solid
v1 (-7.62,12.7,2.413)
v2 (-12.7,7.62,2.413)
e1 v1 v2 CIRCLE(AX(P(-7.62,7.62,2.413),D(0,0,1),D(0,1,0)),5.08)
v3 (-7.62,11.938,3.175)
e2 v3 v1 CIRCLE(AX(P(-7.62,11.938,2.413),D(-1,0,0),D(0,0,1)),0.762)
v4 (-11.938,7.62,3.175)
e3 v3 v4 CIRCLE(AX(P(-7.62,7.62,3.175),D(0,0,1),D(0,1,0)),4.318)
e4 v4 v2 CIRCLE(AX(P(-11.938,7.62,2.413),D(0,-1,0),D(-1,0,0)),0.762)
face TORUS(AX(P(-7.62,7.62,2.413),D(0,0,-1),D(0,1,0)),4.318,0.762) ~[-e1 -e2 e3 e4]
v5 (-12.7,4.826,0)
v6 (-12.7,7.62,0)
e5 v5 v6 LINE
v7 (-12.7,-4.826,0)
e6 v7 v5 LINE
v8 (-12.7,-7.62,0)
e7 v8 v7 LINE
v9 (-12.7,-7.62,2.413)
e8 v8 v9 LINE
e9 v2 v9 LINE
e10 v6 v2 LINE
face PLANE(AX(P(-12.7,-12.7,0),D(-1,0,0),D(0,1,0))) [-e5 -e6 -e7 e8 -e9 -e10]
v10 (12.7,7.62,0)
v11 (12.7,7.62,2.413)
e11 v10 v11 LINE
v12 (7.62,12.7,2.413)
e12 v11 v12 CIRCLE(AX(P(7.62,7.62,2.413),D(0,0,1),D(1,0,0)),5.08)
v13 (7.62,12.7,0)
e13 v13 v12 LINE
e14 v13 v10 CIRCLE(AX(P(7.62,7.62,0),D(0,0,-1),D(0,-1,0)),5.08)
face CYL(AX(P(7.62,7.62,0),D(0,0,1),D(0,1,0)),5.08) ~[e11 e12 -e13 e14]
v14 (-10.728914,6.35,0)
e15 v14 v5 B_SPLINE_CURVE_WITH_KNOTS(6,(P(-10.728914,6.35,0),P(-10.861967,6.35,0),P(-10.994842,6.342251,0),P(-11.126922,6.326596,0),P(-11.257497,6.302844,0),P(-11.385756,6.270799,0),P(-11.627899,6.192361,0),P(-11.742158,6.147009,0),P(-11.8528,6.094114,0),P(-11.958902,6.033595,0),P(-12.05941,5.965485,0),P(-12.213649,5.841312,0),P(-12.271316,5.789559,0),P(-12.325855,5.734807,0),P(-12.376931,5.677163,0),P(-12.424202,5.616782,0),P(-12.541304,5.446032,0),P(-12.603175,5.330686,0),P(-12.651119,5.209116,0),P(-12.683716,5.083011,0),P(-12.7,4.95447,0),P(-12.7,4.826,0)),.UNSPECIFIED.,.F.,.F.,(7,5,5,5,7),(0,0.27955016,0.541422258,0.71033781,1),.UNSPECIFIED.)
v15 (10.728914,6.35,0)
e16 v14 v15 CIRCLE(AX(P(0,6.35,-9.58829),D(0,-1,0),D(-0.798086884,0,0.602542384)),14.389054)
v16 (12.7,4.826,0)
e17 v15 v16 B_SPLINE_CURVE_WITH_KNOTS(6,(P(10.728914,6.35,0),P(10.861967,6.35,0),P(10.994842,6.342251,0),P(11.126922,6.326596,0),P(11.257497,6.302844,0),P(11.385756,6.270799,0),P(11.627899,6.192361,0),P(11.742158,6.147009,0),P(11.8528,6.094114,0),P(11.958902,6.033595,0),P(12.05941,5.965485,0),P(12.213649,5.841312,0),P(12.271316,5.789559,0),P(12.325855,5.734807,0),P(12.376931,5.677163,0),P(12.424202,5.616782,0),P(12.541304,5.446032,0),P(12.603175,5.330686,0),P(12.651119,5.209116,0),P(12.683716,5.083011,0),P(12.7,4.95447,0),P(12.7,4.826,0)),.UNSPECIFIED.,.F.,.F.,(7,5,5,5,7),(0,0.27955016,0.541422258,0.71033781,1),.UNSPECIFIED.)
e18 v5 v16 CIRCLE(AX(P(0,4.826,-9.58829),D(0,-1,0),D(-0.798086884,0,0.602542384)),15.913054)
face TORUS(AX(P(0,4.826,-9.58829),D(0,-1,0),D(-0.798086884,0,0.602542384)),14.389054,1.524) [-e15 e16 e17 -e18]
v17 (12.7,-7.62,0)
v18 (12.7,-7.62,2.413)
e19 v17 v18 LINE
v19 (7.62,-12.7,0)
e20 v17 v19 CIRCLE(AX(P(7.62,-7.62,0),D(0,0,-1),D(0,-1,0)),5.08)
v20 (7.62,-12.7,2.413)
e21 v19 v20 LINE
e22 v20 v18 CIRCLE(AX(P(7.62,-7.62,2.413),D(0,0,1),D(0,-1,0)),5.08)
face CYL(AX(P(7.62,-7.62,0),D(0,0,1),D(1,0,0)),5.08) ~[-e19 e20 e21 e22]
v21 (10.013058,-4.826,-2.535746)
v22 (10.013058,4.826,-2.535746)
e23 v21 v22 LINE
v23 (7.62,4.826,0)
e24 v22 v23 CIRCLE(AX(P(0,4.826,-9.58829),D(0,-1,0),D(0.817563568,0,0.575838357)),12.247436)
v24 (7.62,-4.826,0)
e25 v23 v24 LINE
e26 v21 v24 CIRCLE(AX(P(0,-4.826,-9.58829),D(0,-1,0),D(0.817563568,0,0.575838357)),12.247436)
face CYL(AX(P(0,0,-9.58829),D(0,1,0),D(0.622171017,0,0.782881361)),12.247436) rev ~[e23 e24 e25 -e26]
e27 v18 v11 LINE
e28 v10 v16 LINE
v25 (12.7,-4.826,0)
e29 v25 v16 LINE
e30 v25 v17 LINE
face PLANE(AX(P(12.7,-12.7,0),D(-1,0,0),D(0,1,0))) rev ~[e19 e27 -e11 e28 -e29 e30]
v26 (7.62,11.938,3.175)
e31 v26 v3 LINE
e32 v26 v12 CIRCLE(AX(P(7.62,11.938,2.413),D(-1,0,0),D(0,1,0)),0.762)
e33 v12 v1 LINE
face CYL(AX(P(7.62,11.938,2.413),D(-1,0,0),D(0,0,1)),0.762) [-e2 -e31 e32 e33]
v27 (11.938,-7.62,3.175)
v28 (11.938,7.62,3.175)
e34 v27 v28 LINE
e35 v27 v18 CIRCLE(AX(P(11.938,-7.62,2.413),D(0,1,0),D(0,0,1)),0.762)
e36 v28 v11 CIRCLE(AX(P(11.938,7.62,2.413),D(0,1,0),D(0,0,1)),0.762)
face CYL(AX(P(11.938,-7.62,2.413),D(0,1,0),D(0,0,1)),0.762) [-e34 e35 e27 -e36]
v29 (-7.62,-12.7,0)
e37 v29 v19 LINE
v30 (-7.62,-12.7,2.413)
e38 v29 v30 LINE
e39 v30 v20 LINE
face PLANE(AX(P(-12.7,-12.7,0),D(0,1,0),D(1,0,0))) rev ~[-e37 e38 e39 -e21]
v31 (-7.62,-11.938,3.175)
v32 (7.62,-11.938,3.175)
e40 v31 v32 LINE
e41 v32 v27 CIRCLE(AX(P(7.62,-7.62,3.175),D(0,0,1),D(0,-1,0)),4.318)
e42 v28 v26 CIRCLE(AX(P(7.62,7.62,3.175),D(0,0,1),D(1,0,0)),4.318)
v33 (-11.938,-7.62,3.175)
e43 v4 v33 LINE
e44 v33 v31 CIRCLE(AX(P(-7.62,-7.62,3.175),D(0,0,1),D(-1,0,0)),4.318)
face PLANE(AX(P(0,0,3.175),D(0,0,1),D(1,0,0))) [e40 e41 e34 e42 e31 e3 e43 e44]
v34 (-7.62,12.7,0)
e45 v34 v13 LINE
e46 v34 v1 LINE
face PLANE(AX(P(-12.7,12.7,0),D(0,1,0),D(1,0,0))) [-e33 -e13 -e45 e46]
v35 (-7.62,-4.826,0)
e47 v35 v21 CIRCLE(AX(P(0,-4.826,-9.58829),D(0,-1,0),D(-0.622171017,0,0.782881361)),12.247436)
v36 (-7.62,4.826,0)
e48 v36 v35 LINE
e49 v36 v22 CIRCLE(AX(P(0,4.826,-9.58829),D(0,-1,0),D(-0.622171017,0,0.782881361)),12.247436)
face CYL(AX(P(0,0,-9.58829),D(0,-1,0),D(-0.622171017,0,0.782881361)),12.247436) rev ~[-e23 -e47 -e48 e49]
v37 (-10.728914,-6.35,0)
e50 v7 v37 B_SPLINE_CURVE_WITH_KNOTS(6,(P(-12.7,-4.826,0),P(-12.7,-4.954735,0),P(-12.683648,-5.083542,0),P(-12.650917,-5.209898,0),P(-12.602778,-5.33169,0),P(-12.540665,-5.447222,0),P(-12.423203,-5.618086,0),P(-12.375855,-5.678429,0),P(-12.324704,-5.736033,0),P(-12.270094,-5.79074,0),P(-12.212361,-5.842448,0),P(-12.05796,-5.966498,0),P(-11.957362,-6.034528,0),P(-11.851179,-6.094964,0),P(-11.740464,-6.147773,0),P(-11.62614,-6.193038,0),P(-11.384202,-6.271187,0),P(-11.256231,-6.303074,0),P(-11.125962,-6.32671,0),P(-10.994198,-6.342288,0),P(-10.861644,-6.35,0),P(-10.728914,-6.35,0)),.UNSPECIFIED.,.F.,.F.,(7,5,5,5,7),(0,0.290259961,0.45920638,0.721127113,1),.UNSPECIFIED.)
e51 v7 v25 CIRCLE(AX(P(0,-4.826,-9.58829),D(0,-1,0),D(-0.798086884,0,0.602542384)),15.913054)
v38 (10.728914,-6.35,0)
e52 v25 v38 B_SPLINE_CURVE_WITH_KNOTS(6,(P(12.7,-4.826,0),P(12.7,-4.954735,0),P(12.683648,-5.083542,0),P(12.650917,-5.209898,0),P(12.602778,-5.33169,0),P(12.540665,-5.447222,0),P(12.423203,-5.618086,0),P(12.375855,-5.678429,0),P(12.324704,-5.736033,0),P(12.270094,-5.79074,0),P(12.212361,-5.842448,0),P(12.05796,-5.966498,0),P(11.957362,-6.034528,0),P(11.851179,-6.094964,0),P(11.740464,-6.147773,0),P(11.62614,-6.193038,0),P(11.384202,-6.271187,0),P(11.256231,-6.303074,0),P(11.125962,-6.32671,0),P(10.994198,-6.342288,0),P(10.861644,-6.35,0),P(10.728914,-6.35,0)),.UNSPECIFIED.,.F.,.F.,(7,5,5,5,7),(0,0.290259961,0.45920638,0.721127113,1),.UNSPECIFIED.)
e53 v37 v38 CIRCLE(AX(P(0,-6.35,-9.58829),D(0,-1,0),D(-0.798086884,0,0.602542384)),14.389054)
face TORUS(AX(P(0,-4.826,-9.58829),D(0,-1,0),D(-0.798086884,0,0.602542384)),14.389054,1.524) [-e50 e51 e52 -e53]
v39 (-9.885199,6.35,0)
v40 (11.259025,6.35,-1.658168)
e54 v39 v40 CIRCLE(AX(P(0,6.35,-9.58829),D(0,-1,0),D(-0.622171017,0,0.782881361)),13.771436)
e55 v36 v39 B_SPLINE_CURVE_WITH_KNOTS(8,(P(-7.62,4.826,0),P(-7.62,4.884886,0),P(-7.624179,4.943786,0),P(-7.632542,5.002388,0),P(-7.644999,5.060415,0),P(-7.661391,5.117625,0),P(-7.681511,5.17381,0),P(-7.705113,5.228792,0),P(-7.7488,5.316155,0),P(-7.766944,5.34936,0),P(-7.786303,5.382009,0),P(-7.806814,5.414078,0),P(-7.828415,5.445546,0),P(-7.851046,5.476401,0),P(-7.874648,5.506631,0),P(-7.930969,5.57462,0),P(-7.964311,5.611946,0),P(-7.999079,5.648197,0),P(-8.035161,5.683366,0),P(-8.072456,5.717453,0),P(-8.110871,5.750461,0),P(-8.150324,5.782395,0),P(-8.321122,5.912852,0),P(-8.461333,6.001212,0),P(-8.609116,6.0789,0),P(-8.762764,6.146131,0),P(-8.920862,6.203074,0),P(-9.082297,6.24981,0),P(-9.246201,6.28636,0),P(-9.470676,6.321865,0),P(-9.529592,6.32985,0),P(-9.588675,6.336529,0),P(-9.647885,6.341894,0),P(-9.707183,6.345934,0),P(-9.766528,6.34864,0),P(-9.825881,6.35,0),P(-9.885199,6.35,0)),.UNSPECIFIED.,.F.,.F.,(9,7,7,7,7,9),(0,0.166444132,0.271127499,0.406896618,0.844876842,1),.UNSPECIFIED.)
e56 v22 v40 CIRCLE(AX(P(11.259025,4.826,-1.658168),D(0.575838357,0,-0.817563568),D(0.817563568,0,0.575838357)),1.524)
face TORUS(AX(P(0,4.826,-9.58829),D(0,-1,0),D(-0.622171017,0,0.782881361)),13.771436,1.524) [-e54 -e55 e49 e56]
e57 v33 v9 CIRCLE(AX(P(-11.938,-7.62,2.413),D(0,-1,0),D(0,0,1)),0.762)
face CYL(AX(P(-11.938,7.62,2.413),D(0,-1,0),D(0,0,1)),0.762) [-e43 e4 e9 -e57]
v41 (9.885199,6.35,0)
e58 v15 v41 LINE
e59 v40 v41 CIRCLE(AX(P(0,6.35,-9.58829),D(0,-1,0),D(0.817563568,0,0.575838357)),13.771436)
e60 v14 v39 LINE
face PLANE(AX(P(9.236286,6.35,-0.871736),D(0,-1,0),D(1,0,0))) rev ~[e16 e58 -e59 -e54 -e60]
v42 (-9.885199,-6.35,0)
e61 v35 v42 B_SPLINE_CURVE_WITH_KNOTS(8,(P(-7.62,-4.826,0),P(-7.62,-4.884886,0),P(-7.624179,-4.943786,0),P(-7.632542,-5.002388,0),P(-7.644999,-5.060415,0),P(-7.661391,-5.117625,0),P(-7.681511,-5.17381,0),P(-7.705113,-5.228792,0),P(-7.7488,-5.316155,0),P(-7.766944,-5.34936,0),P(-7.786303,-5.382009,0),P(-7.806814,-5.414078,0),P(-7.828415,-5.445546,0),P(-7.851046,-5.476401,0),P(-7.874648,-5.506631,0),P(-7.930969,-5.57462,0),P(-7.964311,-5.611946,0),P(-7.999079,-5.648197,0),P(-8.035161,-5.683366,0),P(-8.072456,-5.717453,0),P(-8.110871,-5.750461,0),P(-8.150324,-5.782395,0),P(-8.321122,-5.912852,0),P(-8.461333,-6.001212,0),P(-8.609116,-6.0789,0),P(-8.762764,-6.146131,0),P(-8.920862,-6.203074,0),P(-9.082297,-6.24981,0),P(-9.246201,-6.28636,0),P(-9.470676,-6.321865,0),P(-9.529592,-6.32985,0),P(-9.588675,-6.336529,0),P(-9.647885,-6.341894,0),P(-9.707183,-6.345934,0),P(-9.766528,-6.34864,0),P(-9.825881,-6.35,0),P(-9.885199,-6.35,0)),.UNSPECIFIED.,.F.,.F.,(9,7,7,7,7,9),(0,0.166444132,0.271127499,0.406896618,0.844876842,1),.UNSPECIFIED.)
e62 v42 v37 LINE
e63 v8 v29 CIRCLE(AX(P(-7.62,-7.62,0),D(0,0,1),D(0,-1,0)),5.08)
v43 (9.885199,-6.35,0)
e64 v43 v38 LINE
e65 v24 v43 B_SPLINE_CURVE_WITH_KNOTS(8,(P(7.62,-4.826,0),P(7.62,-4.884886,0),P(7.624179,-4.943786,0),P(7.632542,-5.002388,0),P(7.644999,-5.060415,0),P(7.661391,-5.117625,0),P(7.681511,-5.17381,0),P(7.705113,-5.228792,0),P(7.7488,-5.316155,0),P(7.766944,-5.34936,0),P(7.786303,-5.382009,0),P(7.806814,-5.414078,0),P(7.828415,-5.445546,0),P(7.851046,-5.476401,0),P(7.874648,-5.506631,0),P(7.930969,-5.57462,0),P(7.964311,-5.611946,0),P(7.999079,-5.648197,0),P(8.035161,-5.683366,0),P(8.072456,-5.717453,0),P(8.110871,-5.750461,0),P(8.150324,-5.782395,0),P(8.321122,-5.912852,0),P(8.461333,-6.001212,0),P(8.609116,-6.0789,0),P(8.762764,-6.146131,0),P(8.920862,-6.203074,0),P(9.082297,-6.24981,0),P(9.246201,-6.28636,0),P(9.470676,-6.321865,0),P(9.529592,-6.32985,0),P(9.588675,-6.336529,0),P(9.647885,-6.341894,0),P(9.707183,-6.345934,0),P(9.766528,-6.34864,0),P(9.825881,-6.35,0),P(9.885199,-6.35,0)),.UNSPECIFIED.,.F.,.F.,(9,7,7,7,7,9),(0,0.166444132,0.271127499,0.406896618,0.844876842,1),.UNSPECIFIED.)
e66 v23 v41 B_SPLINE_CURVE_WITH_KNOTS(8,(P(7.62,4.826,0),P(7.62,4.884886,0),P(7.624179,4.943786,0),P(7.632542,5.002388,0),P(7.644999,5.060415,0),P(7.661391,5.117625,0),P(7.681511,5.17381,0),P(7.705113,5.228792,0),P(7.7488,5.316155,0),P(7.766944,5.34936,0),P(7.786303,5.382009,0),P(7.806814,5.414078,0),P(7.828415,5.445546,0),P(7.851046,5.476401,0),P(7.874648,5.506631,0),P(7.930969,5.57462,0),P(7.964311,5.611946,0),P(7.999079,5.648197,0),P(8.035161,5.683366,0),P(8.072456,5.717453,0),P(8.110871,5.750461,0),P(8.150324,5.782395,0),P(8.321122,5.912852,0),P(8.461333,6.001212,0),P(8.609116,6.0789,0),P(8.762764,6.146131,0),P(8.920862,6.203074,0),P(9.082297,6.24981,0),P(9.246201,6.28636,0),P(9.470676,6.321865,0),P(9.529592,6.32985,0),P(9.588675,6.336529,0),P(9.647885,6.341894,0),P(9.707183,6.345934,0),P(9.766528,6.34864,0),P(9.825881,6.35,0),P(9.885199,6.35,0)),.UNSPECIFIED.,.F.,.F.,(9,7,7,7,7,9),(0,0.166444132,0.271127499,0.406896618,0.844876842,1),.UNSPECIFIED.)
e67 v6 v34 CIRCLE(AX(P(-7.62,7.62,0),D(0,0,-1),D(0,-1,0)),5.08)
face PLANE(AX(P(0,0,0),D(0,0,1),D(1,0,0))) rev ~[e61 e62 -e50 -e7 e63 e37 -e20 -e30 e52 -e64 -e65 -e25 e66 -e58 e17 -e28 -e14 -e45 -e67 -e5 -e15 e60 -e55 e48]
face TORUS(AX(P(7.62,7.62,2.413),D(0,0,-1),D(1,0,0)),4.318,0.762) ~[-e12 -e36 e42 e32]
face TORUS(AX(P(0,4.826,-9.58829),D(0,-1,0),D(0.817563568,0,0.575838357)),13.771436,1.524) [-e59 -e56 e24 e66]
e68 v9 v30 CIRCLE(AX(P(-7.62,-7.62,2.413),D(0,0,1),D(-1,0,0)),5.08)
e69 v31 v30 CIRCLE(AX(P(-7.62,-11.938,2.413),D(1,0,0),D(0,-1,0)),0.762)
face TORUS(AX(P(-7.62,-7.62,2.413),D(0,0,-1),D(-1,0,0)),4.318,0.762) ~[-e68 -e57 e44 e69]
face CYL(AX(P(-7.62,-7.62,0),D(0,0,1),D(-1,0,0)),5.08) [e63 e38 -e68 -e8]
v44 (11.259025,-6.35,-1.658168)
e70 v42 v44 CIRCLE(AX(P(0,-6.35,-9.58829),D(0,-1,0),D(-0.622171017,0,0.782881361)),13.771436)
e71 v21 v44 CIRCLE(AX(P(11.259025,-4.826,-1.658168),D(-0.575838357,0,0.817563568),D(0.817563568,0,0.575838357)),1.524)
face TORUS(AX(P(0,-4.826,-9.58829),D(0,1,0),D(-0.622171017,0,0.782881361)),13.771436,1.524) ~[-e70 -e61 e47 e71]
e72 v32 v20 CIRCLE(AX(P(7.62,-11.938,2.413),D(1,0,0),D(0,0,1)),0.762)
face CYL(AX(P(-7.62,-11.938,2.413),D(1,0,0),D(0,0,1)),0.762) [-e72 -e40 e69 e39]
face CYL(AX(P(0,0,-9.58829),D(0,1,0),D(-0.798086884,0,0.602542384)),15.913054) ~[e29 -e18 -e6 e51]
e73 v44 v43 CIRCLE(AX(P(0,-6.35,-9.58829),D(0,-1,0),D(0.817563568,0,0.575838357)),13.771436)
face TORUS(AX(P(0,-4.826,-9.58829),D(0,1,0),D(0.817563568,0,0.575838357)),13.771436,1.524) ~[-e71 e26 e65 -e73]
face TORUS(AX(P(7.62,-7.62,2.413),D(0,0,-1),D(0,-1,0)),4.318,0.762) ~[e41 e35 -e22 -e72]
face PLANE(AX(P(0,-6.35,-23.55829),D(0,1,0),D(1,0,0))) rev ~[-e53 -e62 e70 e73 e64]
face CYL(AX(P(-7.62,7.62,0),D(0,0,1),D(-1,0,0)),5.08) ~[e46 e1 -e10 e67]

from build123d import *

# Parameters (mm, degrees)
F0_W     = 25.4
F0_H     = 25.4
F1_DEPTH = 3.175
F3_W     = 5.08
F3_H     = 12.7
F6_DEPTH = 6.35
F7_DEPTH = 6.35
F8_R     = 5.08
F9_R     = 1.524
F10_R    = 0.762


with BuildPart() as f1:
    # F0 (on Top) → F1 (new body)
    with BuildSketch(Plane.XY):
        Rectangle(F0_W, F0_H)
    extrude(amount=F1_DEPTH)

    # F4: sweep along a path in F2
    with BuildLine(Plane.XZ) as f4_path:
        ThreePointArc((-10.16, 0), (0, -23.5582897328), (10.16, 0))
    # F3 (on face) → F4 (sweep)
    with BuildSketch(Plane(origin=(0, 0, 0), x_dir=(1, 0, 0), z_dir=(0, 0, -1))):
        with Locations((-10.16, 0)):
            Rectangle(F3_W, F3_H)
    sweep(path=f4_path.line)

    # F5 (on Front) → F6 (join, through all)
    with BuildSketch(Plane.XZ):
        with BuildLine():
            Line((10.0130578512, -2.535746045), (10.16, 0))
            Line((10.16, 0), (7.62, 0))
            ThreePointArc((7.62, 0), (8.9072265211, -1.1822790439), (10.0130578512, -2.535746045))
        make_face()
    extrude(amount=-F6_DEPTH)

    # F7 (add, through all): a face of the model
    f7_faces = [f1.faces().sort_by_distance(p)[0] for p in [
        (9.3051055783, 0, -0.806788918),
    ]]
    extrude(f7_faces, amount=F7_DEPTH)

    # F8
    f8_edges = [f1.edges().sort_by_distance(p)[0] for p in [
        (12.7, -12.7, 1.5875),
        (12.7, 12.7, 1.5875),
        (-12.7, 12.7, 1.5875),
        (-12.7, -12.7, 1.5875),
    ]]
    fillet(f8_edges, radius=F8_R)

    # F9
    f9_edges = [f1.edges().sort_by_distance(p)[0] for p in [
        (-1.743325, -6.35, -21.711017),
        (-1.743325, 6.35, -21.711017),
        (0, 6.35, -25.501344),
        (0, -6.35, -25.501344),
        (8.907227, -6.35, -1.182279),
        (8.907227, 6.35, -1.182279),
    ]]
    fillet(f9_edges, radius=F9_R)

    # F10
    f10_edges = [f1.edges().sort_by_distance(p)[0] for p in [
        (12.7, 0, 3.175),
        (11.212102, -11.212102, 3.175),
        (11.212102, 11.212102, 3.175),
        (0, -12.7, 3.175),
        (0, 12.7, 3.175),
        (-11.212102, -11.212102, 3.175),
        (-11.212102, 11.212102, 3.175),
        (-12.7, 0, 3.175),
    ]]
    fillet(f10_edges, radius=F10_R)


solid = f1.part
